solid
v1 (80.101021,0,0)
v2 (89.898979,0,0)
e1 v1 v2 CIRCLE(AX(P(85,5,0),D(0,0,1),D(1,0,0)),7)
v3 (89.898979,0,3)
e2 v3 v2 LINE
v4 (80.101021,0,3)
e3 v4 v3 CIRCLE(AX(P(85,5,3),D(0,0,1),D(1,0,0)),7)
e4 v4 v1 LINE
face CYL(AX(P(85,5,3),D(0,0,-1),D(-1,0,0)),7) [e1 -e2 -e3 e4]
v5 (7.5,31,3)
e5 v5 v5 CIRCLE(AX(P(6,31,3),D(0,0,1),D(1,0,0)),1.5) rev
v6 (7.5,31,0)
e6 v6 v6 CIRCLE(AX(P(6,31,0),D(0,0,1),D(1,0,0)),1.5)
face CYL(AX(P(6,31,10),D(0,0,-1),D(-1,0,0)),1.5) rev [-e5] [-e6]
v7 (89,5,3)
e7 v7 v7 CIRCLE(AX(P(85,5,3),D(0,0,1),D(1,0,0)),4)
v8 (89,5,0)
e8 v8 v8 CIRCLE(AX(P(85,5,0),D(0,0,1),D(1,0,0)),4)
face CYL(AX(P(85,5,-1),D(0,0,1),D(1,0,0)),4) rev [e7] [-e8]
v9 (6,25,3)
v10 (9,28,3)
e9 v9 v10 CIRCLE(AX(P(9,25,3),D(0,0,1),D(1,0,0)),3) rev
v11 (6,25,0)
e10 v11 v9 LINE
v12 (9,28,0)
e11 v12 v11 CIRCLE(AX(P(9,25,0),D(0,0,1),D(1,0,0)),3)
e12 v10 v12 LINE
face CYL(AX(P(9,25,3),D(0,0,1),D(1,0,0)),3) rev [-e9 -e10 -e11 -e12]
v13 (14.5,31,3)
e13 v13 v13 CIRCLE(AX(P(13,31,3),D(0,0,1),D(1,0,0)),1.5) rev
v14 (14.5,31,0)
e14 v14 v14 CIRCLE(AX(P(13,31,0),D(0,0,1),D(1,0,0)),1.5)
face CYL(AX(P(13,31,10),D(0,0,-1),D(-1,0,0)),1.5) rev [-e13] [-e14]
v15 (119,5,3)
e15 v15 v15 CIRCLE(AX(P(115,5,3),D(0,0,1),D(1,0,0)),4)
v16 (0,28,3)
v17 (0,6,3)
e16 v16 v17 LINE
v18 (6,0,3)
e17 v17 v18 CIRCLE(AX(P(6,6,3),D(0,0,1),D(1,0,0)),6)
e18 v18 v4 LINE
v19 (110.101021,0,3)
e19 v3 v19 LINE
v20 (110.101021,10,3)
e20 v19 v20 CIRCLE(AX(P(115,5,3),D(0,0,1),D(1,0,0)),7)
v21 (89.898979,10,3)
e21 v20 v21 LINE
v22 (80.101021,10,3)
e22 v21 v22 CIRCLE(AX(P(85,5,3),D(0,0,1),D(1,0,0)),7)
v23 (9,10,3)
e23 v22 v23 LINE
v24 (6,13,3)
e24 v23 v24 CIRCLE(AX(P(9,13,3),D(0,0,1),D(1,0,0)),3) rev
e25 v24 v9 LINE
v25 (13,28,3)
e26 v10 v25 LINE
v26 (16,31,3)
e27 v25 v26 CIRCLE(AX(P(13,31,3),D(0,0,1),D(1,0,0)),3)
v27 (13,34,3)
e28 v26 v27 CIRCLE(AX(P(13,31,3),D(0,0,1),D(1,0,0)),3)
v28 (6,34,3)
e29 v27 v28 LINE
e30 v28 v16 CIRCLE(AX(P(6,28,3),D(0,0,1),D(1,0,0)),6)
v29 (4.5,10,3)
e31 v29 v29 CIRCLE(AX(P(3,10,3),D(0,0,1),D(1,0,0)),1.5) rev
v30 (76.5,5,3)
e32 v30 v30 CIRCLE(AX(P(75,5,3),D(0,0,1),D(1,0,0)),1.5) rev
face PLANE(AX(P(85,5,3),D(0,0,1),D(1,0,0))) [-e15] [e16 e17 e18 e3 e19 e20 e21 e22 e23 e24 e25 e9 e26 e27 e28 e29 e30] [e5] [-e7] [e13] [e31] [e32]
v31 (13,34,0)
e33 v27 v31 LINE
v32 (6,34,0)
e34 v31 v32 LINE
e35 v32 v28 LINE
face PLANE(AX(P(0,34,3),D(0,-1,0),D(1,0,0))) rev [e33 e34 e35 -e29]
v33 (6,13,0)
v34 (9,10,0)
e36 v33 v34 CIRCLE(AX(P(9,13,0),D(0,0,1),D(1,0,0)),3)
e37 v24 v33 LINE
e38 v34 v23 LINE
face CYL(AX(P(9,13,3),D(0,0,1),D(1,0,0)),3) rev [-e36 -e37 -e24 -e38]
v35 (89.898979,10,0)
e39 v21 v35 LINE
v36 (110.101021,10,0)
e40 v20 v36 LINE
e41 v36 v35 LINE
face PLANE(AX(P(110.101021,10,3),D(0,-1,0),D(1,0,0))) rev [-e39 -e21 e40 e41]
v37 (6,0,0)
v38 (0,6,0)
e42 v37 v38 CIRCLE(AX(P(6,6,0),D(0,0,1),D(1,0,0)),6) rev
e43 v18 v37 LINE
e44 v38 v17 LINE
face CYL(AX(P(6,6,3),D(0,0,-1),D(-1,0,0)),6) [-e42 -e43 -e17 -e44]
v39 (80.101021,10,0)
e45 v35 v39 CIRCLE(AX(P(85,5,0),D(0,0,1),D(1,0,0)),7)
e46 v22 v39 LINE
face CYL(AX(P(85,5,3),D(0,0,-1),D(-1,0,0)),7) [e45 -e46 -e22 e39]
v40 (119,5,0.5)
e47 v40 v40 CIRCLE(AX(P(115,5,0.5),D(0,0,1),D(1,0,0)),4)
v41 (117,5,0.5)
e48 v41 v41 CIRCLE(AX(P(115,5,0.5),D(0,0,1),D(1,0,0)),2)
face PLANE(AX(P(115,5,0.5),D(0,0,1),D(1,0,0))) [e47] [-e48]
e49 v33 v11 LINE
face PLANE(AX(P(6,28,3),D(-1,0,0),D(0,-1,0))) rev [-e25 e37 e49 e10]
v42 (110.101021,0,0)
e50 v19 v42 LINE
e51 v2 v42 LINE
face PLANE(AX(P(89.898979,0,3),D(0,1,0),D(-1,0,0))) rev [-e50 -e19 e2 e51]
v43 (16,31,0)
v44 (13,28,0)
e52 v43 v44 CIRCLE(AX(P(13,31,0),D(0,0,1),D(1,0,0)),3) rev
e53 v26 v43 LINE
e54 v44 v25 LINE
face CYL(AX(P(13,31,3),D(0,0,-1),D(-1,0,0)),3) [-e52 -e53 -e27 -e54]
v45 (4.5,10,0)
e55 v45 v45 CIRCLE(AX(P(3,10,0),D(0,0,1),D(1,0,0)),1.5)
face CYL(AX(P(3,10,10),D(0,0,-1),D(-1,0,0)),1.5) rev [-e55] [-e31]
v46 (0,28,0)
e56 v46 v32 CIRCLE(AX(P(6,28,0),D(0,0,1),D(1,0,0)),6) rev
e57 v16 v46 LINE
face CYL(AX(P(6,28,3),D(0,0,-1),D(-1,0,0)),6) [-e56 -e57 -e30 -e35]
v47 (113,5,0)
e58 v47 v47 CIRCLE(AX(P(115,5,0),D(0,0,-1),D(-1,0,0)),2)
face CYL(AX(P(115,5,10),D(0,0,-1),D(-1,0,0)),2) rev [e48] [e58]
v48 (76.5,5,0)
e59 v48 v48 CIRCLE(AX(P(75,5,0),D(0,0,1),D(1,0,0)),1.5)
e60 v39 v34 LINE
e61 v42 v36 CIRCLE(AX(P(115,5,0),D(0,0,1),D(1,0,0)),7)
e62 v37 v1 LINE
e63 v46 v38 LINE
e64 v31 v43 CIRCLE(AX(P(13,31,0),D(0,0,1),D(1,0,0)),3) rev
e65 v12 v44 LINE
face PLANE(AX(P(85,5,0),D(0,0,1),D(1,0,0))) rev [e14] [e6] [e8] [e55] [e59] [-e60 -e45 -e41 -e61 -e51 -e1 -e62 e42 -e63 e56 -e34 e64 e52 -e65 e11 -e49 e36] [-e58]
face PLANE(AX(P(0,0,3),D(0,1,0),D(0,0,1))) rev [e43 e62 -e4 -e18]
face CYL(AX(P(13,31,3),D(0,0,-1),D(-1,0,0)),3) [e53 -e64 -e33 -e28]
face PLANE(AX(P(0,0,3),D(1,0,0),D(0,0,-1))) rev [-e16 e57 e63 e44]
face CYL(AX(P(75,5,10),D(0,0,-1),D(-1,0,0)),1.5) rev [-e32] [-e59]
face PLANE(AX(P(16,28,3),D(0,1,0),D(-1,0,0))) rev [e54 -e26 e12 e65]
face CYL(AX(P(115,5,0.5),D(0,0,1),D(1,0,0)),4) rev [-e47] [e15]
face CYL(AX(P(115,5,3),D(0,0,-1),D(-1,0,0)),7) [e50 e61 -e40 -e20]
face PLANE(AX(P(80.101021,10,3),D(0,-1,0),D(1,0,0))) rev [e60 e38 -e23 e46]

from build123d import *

# Parameters (mm, degrees)
EXTRUDE_1_DEPTH     = 3
SKETCH_3_R          = 4
CUT_EXTRUDE_1_DEPTH = 2.5
FILLET_START        = -1
FILLET_1_DEPTH      = 5
FILLET_1_2_DEPTH    = 3
FILLET_2_R          = 6
SKETCH_4_R          = 4
CUT_EXTRUDE_2_DEPTH = 4
SKETCH_5_R          = 1.5
CUT_EXTRUDE_4_DEPTH = 10
SKETCH_6_R          = 2
CUT_EXTRUDE_5_DEPTH = 10


with BuildPart() as part:
    # 草图1 → 凸台-拉伸1 (new body)
    with BuildSketch(Plane.XY):
        with BuildLine():
            Line((0, 0), (80.101020514, 0))
            ThreePointArc((80.101020514, 0), (85, -2), (89.898979486, 0))
            Line((89.898979486, 0), (110.101020514, 0))
            ThreePointArc((110.101020514, 0), (122, 5), (110.101020514, 10))
            Line((110.101020514, 10), (89.898979486, 10))
            ThreePointArc((89.898979486, 10), (85, 12), (80.101020514, 10))
            Line((80.101020514, 10), (6, 10))
            Line((6, 10), (6, 28))
            Line((6, 28), (16, 28))
            Line((16, 28), (16, 34))
            Line((16, 34), (0, 34))
            Line((0, 34), (0, 0))
        make_face()
    extrude(amount=EXTRUDE_1_DEPTH)

    # 草图3 → 切除-拉伸1 (cut)
    with BuildSketch(Plane.XY.offset(3)):
        with Locations((115, 5)):
            Circle(SKETCH_3_R)
    extrude(amount=-CUT_EXTRUDE_1_DEPTH, mode=Mode.SUBTRACT)

    # 圆角1: read off the stored shape, not the designer's step
    # 圆角1 outline → 圆角1 (cut)
    with BuildSketch(Plane.XY.offset(FILLET_START)):
        with BuildLine():
            ThreePointArc((13, 34), (15.121320344, 33.121320344), (16, 31))
            Line((16, 31), (16, 34))
            Line((16, 34), (13, 34))
        make_face()
        with BuildLine():
            ThreePointArc((16, 31), (15.121320344, 28.878679656), (13, 28))
            Line((13, 28), (16, 28))
            Line((16, 28), (16, 31))
        make_face()
    extrude(amount=FILLET_1_DEPTH, mode=Mode.SUBTRACT)

    # Fillet 1 2 outline → Fillet 1 2 (add)
    with BuildSketch(Plane.XY):
        with BuildLine():
            Line((6, 28), (6, 25))
            ThreePointArc((6, 25), (6.878679656, 27.121320344), (9, 28))
            Line((9, 28), (6, 28))
        make_face()
        with BuildLine():
            ThreePointArc((9, 10), (6.878679656, 10.878679656), (6, 13))
            Line((6, 13), (6, 10))
            Line((6, 10), (9, 10))
        make_face()
    extrude(amount=FILLET_1_2_DEPTH)

    # 圆角2
    fillet_2_edges = [part.edges().sort_by_distance(p)[0] for p in [
        (0, 34, 1.5),
        (0, 0, 1.5),
    ]]
    fillet(fillet_2_edges, radius=FILLET_2_R)

    # 草图4 → 切除-拉伸2 (cut)
    with BuildSketch(Plane.XY.offset(3)):
        with Locations((85, 5)):
            Circle(SKETCH_4_R)
    extrude(amount=-CUT_EXTRUDE_2_DEPTH, mode=Mode.SUBTRACT)

    # 草图5 → 切除-拉伸4 (cut)
    with BuildSketch(Plane.XY):
        with Locations((75, 5)):
            Circle(SKETCH_5_R)
        with Locations((3, 10)):
            Circle(SKETCH_5_R)
        with Locations((13, 31)):
            Circle(SKETCH_5_R)
        with Locations((6, 31)):
            Circle(SKETCH_5_R)
    extrude(amount=CUT_EXTRUDE_4_DEPTH, mode=Mode.SUBTRACT)

    # 草图6 → 切除-拉伸5 (cut)
    with BuildSketch(Plane(origin=(0, 0, 0), x_dir=(-1, 0, 0), z_dir=(0, 0, -1))):
        with Locations((-115, 5)):
            Circle(SKETCH_6_R)
    extrude(amount=-CUT_EXTRUDE_5_DEPTH, mode=Mode.SUBTRACT)


solid = part.part
